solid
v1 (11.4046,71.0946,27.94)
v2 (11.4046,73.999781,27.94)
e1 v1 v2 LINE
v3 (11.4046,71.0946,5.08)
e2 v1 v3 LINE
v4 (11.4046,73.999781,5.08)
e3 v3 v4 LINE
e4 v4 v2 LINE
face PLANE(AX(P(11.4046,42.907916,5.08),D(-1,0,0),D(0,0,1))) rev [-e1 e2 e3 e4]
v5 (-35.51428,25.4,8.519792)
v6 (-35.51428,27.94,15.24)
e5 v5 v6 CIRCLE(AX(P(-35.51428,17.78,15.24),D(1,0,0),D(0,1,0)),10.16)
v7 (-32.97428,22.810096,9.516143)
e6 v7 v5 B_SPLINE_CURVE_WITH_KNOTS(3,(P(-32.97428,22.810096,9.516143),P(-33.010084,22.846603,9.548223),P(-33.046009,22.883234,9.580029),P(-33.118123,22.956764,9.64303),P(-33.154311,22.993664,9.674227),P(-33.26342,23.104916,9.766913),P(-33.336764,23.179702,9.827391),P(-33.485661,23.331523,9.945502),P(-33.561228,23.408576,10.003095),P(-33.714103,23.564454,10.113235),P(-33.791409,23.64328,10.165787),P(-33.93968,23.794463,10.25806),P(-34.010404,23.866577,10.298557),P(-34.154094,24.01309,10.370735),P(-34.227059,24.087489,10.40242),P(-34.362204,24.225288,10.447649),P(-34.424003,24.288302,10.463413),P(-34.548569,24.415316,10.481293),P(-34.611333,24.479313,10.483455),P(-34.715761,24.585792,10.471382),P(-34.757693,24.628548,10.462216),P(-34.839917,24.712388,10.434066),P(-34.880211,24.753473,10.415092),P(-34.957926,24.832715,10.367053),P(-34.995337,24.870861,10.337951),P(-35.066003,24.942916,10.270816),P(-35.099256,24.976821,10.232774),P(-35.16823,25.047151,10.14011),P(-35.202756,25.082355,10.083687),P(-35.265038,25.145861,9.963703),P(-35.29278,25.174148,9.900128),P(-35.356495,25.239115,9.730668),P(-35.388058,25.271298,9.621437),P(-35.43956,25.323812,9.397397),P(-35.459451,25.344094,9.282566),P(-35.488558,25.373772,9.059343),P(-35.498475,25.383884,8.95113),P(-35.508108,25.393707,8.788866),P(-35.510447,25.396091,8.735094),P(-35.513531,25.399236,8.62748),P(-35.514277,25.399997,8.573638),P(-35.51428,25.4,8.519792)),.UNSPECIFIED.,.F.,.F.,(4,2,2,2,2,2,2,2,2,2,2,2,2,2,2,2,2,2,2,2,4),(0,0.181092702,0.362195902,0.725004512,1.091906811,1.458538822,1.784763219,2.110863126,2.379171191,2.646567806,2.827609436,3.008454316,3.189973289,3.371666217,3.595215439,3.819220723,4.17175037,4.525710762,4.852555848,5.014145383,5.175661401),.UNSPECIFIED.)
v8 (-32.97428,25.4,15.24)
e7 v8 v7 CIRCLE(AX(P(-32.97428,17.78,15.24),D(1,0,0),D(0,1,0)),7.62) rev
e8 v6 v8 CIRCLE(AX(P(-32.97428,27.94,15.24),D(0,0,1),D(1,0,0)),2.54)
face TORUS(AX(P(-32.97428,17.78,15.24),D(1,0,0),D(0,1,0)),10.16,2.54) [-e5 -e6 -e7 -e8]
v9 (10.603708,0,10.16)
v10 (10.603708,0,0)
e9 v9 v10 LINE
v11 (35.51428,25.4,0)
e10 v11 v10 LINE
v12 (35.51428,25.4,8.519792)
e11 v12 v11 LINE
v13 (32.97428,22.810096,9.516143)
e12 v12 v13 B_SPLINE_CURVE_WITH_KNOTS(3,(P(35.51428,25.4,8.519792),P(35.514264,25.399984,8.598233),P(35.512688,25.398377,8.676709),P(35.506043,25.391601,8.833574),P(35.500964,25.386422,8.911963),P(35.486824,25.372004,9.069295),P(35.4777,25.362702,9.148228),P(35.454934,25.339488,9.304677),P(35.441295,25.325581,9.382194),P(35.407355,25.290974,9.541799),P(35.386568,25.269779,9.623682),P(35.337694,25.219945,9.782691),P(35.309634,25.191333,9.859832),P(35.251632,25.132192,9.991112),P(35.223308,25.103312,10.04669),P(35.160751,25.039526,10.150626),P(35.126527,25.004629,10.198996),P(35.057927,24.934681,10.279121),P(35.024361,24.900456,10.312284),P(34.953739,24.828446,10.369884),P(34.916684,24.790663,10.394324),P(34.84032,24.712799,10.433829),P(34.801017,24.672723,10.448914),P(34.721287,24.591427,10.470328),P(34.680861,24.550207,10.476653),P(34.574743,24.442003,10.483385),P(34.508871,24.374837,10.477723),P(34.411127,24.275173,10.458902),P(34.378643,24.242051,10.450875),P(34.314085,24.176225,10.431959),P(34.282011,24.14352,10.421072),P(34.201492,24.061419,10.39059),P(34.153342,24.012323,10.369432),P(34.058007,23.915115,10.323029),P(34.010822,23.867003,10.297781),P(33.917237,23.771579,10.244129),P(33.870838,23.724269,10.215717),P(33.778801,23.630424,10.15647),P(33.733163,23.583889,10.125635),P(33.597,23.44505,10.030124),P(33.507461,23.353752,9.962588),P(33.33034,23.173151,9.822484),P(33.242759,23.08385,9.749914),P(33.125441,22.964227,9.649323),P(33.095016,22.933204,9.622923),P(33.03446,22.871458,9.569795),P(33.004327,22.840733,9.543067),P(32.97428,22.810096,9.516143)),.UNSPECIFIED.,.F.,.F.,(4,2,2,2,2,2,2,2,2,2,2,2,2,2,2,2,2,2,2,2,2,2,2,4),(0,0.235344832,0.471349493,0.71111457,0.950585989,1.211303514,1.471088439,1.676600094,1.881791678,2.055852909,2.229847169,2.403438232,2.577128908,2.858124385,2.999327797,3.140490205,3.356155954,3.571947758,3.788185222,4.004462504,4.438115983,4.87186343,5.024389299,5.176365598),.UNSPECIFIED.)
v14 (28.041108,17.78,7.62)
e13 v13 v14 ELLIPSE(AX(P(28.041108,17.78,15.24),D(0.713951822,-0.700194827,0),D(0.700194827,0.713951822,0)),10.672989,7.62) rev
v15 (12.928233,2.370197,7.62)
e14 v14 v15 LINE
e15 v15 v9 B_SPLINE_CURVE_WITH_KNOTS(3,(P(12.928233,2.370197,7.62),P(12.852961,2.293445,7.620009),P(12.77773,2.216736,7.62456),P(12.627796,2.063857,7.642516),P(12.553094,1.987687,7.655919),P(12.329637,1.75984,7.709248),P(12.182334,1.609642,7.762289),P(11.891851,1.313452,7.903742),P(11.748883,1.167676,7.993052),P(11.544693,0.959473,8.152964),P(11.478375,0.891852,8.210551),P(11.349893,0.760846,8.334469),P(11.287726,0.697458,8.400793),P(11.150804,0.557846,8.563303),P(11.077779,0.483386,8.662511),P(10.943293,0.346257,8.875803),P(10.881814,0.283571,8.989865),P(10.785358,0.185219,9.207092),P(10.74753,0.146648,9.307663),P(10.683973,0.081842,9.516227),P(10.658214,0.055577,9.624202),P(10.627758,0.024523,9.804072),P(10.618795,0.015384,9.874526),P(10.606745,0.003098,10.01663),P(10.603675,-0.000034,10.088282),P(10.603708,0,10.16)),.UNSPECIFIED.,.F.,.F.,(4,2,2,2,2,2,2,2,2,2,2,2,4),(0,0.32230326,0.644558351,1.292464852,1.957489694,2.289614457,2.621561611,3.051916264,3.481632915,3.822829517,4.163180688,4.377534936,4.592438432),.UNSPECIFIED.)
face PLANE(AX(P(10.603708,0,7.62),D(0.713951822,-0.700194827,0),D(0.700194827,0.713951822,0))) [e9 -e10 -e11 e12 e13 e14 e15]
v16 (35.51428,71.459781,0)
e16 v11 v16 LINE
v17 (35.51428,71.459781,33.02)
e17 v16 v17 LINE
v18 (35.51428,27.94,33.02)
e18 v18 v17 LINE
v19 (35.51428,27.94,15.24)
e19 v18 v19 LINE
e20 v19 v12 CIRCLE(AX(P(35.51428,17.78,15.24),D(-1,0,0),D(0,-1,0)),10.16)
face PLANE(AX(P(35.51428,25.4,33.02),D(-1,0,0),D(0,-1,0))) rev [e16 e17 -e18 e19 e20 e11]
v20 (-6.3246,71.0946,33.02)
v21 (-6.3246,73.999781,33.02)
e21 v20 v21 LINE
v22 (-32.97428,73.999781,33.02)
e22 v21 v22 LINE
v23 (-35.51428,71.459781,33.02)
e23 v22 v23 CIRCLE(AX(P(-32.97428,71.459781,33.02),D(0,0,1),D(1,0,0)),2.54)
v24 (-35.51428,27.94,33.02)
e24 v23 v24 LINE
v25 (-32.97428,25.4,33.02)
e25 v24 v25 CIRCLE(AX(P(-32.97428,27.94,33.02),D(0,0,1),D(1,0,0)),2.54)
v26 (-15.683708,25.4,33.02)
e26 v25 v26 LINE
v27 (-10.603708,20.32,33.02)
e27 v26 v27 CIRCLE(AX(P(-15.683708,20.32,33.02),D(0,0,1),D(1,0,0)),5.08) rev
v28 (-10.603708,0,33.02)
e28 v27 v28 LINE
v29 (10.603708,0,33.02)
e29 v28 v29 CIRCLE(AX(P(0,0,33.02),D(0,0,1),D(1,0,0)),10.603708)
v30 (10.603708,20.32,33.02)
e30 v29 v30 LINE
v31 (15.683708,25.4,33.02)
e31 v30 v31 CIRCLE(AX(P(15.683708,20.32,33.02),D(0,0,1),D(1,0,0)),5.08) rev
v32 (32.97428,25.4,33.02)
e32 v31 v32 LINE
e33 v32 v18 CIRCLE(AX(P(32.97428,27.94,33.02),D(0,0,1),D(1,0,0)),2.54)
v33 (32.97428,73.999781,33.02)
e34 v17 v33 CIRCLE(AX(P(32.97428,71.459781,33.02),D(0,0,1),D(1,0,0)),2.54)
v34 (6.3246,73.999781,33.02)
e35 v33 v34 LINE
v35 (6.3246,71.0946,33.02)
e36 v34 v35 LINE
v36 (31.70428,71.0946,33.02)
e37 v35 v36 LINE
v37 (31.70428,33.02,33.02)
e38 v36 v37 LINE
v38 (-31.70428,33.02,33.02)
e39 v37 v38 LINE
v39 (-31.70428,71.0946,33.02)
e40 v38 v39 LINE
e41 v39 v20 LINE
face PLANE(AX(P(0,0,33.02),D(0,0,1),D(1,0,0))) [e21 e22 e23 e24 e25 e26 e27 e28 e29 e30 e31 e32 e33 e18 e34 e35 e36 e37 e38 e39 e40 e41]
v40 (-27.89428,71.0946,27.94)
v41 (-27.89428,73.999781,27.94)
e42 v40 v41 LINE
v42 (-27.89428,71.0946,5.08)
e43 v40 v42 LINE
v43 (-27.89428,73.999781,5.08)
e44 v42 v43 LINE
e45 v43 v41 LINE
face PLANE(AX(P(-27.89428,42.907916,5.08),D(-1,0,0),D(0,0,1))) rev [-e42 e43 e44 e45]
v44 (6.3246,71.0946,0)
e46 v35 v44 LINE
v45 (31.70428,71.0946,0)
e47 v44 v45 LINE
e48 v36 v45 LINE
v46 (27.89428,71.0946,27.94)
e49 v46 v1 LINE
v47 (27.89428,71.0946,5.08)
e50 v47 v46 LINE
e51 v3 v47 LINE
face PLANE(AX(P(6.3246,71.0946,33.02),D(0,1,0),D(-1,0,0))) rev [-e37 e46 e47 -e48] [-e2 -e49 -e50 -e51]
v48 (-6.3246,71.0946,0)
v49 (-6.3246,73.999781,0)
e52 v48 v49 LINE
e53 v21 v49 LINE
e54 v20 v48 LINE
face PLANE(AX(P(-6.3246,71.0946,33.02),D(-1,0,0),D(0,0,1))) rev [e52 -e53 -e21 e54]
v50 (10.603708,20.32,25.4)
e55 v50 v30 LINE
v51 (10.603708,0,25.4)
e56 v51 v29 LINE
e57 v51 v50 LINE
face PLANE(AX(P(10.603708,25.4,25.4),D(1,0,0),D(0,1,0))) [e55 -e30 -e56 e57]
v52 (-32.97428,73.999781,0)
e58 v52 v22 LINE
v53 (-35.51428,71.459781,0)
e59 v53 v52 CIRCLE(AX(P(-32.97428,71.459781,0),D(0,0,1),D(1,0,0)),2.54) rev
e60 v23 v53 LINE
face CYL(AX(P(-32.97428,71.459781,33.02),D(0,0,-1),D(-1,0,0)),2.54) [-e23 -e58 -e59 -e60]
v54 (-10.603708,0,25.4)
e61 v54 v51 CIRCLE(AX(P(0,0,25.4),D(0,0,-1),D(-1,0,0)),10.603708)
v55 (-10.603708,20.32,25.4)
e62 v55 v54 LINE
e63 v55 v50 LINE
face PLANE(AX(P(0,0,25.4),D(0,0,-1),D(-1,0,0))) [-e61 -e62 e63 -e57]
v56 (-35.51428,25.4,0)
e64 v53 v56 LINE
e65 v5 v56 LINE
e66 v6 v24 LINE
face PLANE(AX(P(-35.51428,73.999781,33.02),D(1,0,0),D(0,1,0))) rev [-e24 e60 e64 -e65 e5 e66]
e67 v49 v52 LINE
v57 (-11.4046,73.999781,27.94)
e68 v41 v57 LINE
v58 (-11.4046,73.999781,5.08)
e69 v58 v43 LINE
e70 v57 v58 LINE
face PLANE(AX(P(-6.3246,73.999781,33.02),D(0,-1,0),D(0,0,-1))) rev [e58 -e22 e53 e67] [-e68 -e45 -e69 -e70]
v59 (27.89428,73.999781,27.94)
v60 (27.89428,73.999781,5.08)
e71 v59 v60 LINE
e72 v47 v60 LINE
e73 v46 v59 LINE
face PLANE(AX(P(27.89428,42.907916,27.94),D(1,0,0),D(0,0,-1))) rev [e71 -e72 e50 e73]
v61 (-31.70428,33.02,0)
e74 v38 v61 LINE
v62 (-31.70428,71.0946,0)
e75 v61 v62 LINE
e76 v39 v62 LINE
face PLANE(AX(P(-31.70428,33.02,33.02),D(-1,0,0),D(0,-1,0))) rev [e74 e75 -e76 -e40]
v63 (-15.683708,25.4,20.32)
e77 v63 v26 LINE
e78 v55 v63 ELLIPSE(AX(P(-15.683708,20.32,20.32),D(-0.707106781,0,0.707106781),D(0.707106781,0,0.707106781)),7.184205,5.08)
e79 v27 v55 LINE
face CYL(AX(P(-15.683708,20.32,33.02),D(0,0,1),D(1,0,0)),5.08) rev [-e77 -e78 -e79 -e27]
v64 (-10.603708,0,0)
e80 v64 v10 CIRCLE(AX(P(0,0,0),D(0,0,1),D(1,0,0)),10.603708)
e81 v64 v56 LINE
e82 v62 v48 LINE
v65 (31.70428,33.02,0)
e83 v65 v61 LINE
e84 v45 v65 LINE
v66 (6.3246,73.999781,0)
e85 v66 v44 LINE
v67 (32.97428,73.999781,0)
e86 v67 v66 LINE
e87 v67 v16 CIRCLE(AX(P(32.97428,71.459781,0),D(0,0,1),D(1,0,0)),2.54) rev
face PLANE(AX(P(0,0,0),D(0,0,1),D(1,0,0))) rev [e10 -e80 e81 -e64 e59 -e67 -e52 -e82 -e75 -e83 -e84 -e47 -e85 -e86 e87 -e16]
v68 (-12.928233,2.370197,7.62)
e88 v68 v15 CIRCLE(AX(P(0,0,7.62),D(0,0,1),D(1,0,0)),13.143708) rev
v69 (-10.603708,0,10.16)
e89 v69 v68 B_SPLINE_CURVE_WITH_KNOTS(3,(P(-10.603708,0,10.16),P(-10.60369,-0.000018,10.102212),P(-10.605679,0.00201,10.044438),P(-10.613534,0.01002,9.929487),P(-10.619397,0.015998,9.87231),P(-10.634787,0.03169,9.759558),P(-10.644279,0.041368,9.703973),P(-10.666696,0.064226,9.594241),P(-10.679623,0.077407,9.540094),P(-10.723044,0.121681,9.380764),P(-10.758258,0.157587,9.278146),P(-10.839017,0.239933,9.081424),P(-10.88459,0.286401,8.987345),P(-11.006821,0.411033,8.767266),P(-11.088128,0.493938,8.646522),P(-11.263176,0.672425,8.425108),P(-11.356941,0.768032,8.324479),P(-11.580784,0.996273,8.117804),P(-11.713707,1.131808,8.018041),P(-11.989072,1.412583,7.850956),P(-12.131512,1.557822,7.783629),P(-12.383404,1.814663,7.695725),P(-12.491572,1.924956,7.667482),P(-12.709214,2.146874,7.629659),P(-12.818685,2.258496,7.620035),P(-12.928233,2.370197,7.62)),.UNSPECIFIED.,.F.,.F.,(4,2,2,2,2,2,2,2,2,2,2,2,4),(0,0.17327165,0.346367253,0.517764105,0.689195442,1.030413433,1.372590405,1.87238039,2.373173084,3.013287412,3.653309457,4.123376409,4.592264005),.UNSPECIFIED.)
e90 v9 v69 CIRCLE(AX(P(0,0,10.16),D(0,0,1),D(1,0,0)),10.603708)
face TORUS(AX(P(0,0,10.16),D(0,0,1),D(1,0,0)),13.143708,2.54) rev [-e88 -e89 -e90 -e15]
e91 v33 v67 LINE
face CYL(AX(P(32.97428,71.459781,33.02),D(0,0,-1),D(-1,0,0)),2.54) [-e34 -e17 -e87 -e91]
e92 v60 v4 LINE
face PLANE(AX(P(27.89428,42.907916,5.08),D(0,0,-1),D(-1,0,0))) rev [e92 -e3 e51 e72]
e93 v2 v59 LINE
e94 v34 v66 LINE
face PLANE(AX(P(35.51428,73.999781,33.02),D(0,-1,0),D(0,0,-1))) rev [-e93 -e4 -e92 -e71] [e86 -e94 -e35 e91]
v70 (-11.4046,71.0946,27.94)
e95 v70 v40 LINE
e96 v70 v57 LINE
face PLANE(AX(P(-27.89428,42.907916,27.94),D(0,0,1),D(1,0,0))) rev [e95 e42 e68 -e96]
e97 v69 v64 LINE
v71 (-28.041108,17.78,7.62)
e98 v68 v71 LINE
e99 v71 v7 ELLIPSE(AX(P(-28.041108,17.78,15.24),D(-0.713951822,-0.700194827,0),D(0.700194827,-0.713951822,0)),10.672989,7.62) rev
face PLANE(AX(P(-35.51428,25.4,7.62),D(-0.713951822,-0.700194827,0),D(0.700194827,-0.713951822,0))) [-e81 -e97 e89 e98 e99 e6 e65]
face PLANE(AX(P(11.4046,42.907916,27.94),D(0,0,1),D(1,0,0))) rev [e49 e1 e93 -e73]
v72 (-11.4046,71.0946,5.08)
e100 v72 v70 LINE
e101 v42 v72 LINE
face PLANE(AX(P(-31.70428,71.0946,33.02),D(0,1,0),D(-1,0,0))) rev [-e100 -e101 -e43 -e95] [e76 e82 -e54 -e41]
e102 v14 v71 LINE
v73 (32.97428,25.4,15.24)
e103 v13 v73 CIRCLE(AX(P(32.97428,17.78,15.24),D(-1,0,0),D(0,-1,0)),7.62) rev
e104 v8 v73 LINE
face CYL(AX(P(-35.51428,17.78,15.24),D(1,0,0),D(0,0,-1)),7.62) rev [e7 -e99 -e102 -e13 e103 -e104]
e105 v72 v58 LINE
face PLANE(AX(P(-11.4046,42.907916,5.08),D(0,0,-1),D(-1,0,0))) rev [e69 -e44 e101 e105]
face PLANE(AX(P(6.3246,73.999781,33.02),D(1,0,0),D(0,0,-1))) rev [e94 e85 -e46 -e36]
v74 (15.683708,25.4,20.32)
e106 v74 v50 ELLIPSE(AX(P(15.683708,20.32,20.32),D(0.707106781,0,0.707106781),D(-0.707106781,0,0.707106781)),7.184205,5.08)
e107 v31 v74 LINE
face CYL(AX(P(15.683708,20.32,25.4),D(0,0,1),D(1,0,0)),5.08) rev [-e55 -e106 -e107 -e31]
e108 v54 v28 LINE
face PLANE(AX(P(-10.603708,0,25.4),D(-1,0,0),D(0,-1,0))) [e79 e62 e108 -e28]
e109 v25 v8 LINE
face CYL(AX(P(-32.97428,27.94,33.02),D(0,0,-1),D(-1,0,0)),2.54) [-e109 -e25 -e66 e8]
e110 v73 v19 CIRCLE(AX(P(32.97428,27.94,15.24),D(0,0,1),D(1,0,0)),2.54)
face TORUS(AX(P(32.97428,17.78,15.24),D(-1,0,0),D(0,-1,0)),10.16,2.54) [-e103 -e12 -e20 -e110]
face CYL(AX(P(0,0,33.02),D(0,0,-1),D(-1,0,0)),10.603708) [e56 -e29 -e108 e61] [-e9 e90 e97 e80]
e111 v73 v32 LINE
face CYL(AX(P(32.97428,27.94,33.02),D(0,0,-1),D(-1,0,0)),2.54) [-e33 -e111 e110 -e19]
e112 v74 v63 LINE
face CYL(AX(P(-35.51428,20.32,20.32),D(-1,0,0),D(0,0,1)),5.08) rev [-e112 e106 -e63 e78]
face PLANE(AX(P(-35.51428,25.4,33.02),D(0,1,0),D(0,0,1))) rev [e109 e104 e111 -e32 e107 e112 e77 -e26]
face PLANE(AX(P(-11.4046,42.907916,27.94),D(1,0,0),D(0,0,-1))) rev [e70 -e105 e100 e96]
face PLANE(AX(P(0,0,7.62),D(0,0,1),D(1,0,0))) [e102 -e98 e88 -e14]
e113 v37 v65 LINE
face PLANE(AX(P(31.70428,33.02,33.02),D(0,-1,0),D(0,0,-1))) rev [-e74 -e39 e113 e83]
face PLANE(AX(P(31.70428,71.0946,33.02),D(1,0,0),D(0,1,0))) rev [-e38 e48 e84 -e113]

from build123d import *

# Parameters (mm, degrees)
SKETCH1_R             = 10.603707514
BOSS_EXTRUDE1_DEPTH   = 33.02
BOSS_EXTRUDE1_2_DEPTH = 33.02
BOSS_EXTRUDE3_DEPTH   = 7.62
FILLET1_R             = 7.62
FILLET2_START         = 15.24
FILLET2_2_DEPTH       = 18.76
FILLET2_START_2       = -1
FILLET2_3_DEPTH       = 18.231506659
FILLET3_R             = 2.54
SKETCH6_W             = 16.48968
SKETCH6_H             = 22.86
CUT_EXTRUDE1_DEPTH    = 2.905181288
SKETCH7_W             = 21.207415028
SKETCH7_H             = 25.4
BOSS_EXTRUDE4_DEPTH   = 7.62
FILLET4_R             = 5.08


with BuildPart() as part:
    # Sketch1 → Boss-Extrude1 (new body)
    with BuildSketch(Plane.XY):
        Circle(SKETCH1_R)
    extrude(amount=BOSS_EXTRUDE1_DEPTH)



with BuildPart() as body_2:
    # Sketch1 → Boss-Extrude1 2 (new body)
    with BuildSketch(Plane.XY):
        Polygon((-35.51428, 73.999781288), (-35.51428, 25.4), (35.51428, 25.4), (35.51428, 73.999781288), (6.3246, 73.999781288), (6.3246, 71.0946), (31.70428, 71.0946), (31.70428, 33.02), (-31.70428, 33.02), (-31.70428, 71.0946), (-6.3246, 71.0946), (-6.3246, 73.999781288), align=None)
    extrude(amount=BOSS_EXTRUDE1_2_DEPTH)


with BuildPart() as part_1:
    add(part.part)

    add(body_2.part)  # Boss-Extrude3 merges body 2
    # Sketch3 → Boss-Extrude3 (add)
    with BuildSketch(Plane(origin=(0, 0, 0), x_dir=(-1, 0, 0), z_dir=(0, 0, -1))):
        with BuildLine():
            Line((-10.603707514, 0), (-35.51428, 25.4))
            Line((-35.51428, 25.4), (35.51428, 25.4))
            Line((35.51428, 25.4), (10.603707514, 0))
            ThreePointArc((10.603707514, 0), (0, -10.603707514), (-10.603707514, 0))
        make_face()
    extrude(amount=-BOSS_EXTRUDE3_DEPTH)

    # Fillet1
    fillet1_edges = [part_1.edges().sort_by_distance(p)[0] for p in [
        (0, 25.4, 7.62),
    ]]
    fillet(fillet1_edges, radius=FILLET1_R)

    # Fillet2: read off the stored shape, not the designer's step
    # Fillet2 outline → Fillet2 (revolve, cut)
    with BuildSketch(Plane(origin=(0, 17.78, 15.24), x_dir=(0, 1, 0), z_dir=(0, 0, -1))):
        with BuildLine():
            ThreePointArc((10.16, -35.51428), (8.363948776, -34.770331224), (7.62, -32.97428))
            Line((7.62, -32.97428), (7.62, -35.51428))
            Line((7.62, -35.51428), (10.16, -35.51428))
        make_face()
        with BuildLine():
            Line((7.62, 35.51428), (7.62, 32.97428))
            ThreePointArc((7.62, 32.97428), (8.363948776, 34.770331224), (10.16, 35.51428))
            Line((10.16, 35.51428), (7.62, 35.51428))
        make_face()
    revolve(axis=Axis((0, 17.78, 15.24), (1, 0, 0)), mode=Mode.SUBTRACT)

    # Fillet2 2 outline → Fillet2 2 (cut)
    with BuildSketch(Plane.XY.offset(FILLET2_START)):
        with BuildLine():
            Line((-35.51428, 73.999781288), (-35.51428, 71.459781288))
            ThreePointArc((-35.51428, 71.459781288), (-34.770331224, 73.255832512), (-32.97428, 73.999781288))
            Line((-32.97428, 73.999781288), (-35.51428, 73.999781288))
        make_face()
        with BuildLine():
            ThreePointArc((32.97428, 73.999781288), (34.770331224, 73.255832512), (35.51428, 71.459781288))
            Line((35.51428, 71.459781288), (35.51428, 73.999781288))
            Line((35.51428, 73.999781288), (32.97428, 73.999781288))
        make_face()
        with BuildLine():
            ThreePointArc((35.51428, 27.94), (34.770331224, 26.143948776), (32.97428, 25.4))
            Line((32.97428, 25.4), (35.51428, 25.4))
            Line((35.51428, 25.4), (35.51428, 27.94))
        make_face()
        with BuildLine():
            ThreePointArc((-32.97428, 25.4), (-34.770331224, 26.143948776), (-35.51428, 27.94))
            Line((-35.51428, 27.94), (-35.51428, 25.4))
            Line((-35.51428, 25.4), (-32.97428, 25.4))
        make_face()
    extrude(amount=FILLET2_2_DEPTH, mode=Mode.SUBTRACT)

    # Fillet2 3 outline → Fillet2 3 (cut)
    with BuildSketch(Plane.XY.offset(FILLET2_START_2)):
        with BuildLine():
            Line((-35.51428, 73.999781288), (-35.51428, 71.459781288))
            ThreePointArc((-35.51428, 71.459781288), (-34.770331224, 73.255832512), (-32.97428, 73.999781288))
            Line((-32.97428, 73.999781288), (-35.51428, 73.999781288))
        make_face()
        with BuildLine():
            ThreePointArc((32.97428, 73.999781288), (34.770331224, 73.255832512), (35.51428, 71.459781288))
            Line((35.51428, 71.459781288), (35.51428, 73.999781288))
            Line((35.51428, 73.999781288), (32.97428, 73.999781288))
        make_face()
    extrude(amount=FILLET2_3_DEPTH, mode=Mode.SUBTRACT)

    # Fillet3
    # the kernel refuses this fillet: 2.54 mm, written as the material it adds along each edge
    with BuildSketch(Plane(origin=(0, 0, 7.62), x_dir=(-0.8254427651523181, -0.5644858204221742, 0), z_dir=(0.5644858204221742, -0.8254427651523181, 0))) as fillet3_piece_1_section:
        with BuildLine():
            CenterArc((10.603707514 + FILLET3_R, -FILLET3_R), FILLET3_R, 90, 90)
            Line((10.603707514 + FILLET3_R, 0), (10.603707514, 0))
            Line((10.603707514, 0), (10.603707514, -FILLET3_R))
        make_face()
    fillet3_piece_1 = revolve(axis=Axis((0, 0, 7.62), (0, 0, -1)), revolution_arc=248.733186756, mode=Mode.PRIVATE)
    fillet3_piece_1 = split(fillet3_piece_1, bisect_by=Plane(origin=(5.404998183, -5.300850355, 7.62), z_dir=(-0.713951821892461, 0.7001948271848599, 0)), keep=Keep.TOP, mode=Mode.PRIVATE)
    fillet3_piece_1 = split(fillet3_piece_1, bisect_by=Plane(origin=(-5.404998183, -5.300850355, 7.62), z_dir=(0.713951821892461, 0.7001948271848599, 0)), keep=Keep.TOP, mode=Mode.PRIVATE)
    add(fillet3_piece_1)

    # Sketch6 → Cut-Extrude1 (cut)
    with BuildSketch(Plane(origin=(0, 73.999781288, 0), x_dir=(1, 0, 0), z_dir=(0, 1, 0))):
        with Locations((-19.64944, -16.51)):
            Rectangle(SKETCH6_W, SKETCH6_H)
        with Locations((19.64944, -16.51)):
            Rectangle(SKETCH6_W, SKETCH6_H)
    extrude(amount=-CUT_EXTRUDE1_DEPTH, mode=Mode.SUBTRACT)

    # Sketch7 → Boss-Extrude4 (add)
    with BuildSketch(Plane.XY.offset(33.02)):
        with Locations((0, 12.7)):
            Rectangle(SKETCH7_W, SKETCH7_H)
    extrude(amount=-BOSS_EXTRUDE4_DEPTH)

    # Fillet4
    fillet4_edges = [part_1.edges().sort_by_distance(p)[0] for p in [
        (0, 25.4, 25.4),
        (-10.603707514, 25.4, 29.21),
        (10.603707514, 25.4, 29.21),
    ]]
    fillet(fillet4_edges, radius=FILLET4_R)


solid = part_1.part
